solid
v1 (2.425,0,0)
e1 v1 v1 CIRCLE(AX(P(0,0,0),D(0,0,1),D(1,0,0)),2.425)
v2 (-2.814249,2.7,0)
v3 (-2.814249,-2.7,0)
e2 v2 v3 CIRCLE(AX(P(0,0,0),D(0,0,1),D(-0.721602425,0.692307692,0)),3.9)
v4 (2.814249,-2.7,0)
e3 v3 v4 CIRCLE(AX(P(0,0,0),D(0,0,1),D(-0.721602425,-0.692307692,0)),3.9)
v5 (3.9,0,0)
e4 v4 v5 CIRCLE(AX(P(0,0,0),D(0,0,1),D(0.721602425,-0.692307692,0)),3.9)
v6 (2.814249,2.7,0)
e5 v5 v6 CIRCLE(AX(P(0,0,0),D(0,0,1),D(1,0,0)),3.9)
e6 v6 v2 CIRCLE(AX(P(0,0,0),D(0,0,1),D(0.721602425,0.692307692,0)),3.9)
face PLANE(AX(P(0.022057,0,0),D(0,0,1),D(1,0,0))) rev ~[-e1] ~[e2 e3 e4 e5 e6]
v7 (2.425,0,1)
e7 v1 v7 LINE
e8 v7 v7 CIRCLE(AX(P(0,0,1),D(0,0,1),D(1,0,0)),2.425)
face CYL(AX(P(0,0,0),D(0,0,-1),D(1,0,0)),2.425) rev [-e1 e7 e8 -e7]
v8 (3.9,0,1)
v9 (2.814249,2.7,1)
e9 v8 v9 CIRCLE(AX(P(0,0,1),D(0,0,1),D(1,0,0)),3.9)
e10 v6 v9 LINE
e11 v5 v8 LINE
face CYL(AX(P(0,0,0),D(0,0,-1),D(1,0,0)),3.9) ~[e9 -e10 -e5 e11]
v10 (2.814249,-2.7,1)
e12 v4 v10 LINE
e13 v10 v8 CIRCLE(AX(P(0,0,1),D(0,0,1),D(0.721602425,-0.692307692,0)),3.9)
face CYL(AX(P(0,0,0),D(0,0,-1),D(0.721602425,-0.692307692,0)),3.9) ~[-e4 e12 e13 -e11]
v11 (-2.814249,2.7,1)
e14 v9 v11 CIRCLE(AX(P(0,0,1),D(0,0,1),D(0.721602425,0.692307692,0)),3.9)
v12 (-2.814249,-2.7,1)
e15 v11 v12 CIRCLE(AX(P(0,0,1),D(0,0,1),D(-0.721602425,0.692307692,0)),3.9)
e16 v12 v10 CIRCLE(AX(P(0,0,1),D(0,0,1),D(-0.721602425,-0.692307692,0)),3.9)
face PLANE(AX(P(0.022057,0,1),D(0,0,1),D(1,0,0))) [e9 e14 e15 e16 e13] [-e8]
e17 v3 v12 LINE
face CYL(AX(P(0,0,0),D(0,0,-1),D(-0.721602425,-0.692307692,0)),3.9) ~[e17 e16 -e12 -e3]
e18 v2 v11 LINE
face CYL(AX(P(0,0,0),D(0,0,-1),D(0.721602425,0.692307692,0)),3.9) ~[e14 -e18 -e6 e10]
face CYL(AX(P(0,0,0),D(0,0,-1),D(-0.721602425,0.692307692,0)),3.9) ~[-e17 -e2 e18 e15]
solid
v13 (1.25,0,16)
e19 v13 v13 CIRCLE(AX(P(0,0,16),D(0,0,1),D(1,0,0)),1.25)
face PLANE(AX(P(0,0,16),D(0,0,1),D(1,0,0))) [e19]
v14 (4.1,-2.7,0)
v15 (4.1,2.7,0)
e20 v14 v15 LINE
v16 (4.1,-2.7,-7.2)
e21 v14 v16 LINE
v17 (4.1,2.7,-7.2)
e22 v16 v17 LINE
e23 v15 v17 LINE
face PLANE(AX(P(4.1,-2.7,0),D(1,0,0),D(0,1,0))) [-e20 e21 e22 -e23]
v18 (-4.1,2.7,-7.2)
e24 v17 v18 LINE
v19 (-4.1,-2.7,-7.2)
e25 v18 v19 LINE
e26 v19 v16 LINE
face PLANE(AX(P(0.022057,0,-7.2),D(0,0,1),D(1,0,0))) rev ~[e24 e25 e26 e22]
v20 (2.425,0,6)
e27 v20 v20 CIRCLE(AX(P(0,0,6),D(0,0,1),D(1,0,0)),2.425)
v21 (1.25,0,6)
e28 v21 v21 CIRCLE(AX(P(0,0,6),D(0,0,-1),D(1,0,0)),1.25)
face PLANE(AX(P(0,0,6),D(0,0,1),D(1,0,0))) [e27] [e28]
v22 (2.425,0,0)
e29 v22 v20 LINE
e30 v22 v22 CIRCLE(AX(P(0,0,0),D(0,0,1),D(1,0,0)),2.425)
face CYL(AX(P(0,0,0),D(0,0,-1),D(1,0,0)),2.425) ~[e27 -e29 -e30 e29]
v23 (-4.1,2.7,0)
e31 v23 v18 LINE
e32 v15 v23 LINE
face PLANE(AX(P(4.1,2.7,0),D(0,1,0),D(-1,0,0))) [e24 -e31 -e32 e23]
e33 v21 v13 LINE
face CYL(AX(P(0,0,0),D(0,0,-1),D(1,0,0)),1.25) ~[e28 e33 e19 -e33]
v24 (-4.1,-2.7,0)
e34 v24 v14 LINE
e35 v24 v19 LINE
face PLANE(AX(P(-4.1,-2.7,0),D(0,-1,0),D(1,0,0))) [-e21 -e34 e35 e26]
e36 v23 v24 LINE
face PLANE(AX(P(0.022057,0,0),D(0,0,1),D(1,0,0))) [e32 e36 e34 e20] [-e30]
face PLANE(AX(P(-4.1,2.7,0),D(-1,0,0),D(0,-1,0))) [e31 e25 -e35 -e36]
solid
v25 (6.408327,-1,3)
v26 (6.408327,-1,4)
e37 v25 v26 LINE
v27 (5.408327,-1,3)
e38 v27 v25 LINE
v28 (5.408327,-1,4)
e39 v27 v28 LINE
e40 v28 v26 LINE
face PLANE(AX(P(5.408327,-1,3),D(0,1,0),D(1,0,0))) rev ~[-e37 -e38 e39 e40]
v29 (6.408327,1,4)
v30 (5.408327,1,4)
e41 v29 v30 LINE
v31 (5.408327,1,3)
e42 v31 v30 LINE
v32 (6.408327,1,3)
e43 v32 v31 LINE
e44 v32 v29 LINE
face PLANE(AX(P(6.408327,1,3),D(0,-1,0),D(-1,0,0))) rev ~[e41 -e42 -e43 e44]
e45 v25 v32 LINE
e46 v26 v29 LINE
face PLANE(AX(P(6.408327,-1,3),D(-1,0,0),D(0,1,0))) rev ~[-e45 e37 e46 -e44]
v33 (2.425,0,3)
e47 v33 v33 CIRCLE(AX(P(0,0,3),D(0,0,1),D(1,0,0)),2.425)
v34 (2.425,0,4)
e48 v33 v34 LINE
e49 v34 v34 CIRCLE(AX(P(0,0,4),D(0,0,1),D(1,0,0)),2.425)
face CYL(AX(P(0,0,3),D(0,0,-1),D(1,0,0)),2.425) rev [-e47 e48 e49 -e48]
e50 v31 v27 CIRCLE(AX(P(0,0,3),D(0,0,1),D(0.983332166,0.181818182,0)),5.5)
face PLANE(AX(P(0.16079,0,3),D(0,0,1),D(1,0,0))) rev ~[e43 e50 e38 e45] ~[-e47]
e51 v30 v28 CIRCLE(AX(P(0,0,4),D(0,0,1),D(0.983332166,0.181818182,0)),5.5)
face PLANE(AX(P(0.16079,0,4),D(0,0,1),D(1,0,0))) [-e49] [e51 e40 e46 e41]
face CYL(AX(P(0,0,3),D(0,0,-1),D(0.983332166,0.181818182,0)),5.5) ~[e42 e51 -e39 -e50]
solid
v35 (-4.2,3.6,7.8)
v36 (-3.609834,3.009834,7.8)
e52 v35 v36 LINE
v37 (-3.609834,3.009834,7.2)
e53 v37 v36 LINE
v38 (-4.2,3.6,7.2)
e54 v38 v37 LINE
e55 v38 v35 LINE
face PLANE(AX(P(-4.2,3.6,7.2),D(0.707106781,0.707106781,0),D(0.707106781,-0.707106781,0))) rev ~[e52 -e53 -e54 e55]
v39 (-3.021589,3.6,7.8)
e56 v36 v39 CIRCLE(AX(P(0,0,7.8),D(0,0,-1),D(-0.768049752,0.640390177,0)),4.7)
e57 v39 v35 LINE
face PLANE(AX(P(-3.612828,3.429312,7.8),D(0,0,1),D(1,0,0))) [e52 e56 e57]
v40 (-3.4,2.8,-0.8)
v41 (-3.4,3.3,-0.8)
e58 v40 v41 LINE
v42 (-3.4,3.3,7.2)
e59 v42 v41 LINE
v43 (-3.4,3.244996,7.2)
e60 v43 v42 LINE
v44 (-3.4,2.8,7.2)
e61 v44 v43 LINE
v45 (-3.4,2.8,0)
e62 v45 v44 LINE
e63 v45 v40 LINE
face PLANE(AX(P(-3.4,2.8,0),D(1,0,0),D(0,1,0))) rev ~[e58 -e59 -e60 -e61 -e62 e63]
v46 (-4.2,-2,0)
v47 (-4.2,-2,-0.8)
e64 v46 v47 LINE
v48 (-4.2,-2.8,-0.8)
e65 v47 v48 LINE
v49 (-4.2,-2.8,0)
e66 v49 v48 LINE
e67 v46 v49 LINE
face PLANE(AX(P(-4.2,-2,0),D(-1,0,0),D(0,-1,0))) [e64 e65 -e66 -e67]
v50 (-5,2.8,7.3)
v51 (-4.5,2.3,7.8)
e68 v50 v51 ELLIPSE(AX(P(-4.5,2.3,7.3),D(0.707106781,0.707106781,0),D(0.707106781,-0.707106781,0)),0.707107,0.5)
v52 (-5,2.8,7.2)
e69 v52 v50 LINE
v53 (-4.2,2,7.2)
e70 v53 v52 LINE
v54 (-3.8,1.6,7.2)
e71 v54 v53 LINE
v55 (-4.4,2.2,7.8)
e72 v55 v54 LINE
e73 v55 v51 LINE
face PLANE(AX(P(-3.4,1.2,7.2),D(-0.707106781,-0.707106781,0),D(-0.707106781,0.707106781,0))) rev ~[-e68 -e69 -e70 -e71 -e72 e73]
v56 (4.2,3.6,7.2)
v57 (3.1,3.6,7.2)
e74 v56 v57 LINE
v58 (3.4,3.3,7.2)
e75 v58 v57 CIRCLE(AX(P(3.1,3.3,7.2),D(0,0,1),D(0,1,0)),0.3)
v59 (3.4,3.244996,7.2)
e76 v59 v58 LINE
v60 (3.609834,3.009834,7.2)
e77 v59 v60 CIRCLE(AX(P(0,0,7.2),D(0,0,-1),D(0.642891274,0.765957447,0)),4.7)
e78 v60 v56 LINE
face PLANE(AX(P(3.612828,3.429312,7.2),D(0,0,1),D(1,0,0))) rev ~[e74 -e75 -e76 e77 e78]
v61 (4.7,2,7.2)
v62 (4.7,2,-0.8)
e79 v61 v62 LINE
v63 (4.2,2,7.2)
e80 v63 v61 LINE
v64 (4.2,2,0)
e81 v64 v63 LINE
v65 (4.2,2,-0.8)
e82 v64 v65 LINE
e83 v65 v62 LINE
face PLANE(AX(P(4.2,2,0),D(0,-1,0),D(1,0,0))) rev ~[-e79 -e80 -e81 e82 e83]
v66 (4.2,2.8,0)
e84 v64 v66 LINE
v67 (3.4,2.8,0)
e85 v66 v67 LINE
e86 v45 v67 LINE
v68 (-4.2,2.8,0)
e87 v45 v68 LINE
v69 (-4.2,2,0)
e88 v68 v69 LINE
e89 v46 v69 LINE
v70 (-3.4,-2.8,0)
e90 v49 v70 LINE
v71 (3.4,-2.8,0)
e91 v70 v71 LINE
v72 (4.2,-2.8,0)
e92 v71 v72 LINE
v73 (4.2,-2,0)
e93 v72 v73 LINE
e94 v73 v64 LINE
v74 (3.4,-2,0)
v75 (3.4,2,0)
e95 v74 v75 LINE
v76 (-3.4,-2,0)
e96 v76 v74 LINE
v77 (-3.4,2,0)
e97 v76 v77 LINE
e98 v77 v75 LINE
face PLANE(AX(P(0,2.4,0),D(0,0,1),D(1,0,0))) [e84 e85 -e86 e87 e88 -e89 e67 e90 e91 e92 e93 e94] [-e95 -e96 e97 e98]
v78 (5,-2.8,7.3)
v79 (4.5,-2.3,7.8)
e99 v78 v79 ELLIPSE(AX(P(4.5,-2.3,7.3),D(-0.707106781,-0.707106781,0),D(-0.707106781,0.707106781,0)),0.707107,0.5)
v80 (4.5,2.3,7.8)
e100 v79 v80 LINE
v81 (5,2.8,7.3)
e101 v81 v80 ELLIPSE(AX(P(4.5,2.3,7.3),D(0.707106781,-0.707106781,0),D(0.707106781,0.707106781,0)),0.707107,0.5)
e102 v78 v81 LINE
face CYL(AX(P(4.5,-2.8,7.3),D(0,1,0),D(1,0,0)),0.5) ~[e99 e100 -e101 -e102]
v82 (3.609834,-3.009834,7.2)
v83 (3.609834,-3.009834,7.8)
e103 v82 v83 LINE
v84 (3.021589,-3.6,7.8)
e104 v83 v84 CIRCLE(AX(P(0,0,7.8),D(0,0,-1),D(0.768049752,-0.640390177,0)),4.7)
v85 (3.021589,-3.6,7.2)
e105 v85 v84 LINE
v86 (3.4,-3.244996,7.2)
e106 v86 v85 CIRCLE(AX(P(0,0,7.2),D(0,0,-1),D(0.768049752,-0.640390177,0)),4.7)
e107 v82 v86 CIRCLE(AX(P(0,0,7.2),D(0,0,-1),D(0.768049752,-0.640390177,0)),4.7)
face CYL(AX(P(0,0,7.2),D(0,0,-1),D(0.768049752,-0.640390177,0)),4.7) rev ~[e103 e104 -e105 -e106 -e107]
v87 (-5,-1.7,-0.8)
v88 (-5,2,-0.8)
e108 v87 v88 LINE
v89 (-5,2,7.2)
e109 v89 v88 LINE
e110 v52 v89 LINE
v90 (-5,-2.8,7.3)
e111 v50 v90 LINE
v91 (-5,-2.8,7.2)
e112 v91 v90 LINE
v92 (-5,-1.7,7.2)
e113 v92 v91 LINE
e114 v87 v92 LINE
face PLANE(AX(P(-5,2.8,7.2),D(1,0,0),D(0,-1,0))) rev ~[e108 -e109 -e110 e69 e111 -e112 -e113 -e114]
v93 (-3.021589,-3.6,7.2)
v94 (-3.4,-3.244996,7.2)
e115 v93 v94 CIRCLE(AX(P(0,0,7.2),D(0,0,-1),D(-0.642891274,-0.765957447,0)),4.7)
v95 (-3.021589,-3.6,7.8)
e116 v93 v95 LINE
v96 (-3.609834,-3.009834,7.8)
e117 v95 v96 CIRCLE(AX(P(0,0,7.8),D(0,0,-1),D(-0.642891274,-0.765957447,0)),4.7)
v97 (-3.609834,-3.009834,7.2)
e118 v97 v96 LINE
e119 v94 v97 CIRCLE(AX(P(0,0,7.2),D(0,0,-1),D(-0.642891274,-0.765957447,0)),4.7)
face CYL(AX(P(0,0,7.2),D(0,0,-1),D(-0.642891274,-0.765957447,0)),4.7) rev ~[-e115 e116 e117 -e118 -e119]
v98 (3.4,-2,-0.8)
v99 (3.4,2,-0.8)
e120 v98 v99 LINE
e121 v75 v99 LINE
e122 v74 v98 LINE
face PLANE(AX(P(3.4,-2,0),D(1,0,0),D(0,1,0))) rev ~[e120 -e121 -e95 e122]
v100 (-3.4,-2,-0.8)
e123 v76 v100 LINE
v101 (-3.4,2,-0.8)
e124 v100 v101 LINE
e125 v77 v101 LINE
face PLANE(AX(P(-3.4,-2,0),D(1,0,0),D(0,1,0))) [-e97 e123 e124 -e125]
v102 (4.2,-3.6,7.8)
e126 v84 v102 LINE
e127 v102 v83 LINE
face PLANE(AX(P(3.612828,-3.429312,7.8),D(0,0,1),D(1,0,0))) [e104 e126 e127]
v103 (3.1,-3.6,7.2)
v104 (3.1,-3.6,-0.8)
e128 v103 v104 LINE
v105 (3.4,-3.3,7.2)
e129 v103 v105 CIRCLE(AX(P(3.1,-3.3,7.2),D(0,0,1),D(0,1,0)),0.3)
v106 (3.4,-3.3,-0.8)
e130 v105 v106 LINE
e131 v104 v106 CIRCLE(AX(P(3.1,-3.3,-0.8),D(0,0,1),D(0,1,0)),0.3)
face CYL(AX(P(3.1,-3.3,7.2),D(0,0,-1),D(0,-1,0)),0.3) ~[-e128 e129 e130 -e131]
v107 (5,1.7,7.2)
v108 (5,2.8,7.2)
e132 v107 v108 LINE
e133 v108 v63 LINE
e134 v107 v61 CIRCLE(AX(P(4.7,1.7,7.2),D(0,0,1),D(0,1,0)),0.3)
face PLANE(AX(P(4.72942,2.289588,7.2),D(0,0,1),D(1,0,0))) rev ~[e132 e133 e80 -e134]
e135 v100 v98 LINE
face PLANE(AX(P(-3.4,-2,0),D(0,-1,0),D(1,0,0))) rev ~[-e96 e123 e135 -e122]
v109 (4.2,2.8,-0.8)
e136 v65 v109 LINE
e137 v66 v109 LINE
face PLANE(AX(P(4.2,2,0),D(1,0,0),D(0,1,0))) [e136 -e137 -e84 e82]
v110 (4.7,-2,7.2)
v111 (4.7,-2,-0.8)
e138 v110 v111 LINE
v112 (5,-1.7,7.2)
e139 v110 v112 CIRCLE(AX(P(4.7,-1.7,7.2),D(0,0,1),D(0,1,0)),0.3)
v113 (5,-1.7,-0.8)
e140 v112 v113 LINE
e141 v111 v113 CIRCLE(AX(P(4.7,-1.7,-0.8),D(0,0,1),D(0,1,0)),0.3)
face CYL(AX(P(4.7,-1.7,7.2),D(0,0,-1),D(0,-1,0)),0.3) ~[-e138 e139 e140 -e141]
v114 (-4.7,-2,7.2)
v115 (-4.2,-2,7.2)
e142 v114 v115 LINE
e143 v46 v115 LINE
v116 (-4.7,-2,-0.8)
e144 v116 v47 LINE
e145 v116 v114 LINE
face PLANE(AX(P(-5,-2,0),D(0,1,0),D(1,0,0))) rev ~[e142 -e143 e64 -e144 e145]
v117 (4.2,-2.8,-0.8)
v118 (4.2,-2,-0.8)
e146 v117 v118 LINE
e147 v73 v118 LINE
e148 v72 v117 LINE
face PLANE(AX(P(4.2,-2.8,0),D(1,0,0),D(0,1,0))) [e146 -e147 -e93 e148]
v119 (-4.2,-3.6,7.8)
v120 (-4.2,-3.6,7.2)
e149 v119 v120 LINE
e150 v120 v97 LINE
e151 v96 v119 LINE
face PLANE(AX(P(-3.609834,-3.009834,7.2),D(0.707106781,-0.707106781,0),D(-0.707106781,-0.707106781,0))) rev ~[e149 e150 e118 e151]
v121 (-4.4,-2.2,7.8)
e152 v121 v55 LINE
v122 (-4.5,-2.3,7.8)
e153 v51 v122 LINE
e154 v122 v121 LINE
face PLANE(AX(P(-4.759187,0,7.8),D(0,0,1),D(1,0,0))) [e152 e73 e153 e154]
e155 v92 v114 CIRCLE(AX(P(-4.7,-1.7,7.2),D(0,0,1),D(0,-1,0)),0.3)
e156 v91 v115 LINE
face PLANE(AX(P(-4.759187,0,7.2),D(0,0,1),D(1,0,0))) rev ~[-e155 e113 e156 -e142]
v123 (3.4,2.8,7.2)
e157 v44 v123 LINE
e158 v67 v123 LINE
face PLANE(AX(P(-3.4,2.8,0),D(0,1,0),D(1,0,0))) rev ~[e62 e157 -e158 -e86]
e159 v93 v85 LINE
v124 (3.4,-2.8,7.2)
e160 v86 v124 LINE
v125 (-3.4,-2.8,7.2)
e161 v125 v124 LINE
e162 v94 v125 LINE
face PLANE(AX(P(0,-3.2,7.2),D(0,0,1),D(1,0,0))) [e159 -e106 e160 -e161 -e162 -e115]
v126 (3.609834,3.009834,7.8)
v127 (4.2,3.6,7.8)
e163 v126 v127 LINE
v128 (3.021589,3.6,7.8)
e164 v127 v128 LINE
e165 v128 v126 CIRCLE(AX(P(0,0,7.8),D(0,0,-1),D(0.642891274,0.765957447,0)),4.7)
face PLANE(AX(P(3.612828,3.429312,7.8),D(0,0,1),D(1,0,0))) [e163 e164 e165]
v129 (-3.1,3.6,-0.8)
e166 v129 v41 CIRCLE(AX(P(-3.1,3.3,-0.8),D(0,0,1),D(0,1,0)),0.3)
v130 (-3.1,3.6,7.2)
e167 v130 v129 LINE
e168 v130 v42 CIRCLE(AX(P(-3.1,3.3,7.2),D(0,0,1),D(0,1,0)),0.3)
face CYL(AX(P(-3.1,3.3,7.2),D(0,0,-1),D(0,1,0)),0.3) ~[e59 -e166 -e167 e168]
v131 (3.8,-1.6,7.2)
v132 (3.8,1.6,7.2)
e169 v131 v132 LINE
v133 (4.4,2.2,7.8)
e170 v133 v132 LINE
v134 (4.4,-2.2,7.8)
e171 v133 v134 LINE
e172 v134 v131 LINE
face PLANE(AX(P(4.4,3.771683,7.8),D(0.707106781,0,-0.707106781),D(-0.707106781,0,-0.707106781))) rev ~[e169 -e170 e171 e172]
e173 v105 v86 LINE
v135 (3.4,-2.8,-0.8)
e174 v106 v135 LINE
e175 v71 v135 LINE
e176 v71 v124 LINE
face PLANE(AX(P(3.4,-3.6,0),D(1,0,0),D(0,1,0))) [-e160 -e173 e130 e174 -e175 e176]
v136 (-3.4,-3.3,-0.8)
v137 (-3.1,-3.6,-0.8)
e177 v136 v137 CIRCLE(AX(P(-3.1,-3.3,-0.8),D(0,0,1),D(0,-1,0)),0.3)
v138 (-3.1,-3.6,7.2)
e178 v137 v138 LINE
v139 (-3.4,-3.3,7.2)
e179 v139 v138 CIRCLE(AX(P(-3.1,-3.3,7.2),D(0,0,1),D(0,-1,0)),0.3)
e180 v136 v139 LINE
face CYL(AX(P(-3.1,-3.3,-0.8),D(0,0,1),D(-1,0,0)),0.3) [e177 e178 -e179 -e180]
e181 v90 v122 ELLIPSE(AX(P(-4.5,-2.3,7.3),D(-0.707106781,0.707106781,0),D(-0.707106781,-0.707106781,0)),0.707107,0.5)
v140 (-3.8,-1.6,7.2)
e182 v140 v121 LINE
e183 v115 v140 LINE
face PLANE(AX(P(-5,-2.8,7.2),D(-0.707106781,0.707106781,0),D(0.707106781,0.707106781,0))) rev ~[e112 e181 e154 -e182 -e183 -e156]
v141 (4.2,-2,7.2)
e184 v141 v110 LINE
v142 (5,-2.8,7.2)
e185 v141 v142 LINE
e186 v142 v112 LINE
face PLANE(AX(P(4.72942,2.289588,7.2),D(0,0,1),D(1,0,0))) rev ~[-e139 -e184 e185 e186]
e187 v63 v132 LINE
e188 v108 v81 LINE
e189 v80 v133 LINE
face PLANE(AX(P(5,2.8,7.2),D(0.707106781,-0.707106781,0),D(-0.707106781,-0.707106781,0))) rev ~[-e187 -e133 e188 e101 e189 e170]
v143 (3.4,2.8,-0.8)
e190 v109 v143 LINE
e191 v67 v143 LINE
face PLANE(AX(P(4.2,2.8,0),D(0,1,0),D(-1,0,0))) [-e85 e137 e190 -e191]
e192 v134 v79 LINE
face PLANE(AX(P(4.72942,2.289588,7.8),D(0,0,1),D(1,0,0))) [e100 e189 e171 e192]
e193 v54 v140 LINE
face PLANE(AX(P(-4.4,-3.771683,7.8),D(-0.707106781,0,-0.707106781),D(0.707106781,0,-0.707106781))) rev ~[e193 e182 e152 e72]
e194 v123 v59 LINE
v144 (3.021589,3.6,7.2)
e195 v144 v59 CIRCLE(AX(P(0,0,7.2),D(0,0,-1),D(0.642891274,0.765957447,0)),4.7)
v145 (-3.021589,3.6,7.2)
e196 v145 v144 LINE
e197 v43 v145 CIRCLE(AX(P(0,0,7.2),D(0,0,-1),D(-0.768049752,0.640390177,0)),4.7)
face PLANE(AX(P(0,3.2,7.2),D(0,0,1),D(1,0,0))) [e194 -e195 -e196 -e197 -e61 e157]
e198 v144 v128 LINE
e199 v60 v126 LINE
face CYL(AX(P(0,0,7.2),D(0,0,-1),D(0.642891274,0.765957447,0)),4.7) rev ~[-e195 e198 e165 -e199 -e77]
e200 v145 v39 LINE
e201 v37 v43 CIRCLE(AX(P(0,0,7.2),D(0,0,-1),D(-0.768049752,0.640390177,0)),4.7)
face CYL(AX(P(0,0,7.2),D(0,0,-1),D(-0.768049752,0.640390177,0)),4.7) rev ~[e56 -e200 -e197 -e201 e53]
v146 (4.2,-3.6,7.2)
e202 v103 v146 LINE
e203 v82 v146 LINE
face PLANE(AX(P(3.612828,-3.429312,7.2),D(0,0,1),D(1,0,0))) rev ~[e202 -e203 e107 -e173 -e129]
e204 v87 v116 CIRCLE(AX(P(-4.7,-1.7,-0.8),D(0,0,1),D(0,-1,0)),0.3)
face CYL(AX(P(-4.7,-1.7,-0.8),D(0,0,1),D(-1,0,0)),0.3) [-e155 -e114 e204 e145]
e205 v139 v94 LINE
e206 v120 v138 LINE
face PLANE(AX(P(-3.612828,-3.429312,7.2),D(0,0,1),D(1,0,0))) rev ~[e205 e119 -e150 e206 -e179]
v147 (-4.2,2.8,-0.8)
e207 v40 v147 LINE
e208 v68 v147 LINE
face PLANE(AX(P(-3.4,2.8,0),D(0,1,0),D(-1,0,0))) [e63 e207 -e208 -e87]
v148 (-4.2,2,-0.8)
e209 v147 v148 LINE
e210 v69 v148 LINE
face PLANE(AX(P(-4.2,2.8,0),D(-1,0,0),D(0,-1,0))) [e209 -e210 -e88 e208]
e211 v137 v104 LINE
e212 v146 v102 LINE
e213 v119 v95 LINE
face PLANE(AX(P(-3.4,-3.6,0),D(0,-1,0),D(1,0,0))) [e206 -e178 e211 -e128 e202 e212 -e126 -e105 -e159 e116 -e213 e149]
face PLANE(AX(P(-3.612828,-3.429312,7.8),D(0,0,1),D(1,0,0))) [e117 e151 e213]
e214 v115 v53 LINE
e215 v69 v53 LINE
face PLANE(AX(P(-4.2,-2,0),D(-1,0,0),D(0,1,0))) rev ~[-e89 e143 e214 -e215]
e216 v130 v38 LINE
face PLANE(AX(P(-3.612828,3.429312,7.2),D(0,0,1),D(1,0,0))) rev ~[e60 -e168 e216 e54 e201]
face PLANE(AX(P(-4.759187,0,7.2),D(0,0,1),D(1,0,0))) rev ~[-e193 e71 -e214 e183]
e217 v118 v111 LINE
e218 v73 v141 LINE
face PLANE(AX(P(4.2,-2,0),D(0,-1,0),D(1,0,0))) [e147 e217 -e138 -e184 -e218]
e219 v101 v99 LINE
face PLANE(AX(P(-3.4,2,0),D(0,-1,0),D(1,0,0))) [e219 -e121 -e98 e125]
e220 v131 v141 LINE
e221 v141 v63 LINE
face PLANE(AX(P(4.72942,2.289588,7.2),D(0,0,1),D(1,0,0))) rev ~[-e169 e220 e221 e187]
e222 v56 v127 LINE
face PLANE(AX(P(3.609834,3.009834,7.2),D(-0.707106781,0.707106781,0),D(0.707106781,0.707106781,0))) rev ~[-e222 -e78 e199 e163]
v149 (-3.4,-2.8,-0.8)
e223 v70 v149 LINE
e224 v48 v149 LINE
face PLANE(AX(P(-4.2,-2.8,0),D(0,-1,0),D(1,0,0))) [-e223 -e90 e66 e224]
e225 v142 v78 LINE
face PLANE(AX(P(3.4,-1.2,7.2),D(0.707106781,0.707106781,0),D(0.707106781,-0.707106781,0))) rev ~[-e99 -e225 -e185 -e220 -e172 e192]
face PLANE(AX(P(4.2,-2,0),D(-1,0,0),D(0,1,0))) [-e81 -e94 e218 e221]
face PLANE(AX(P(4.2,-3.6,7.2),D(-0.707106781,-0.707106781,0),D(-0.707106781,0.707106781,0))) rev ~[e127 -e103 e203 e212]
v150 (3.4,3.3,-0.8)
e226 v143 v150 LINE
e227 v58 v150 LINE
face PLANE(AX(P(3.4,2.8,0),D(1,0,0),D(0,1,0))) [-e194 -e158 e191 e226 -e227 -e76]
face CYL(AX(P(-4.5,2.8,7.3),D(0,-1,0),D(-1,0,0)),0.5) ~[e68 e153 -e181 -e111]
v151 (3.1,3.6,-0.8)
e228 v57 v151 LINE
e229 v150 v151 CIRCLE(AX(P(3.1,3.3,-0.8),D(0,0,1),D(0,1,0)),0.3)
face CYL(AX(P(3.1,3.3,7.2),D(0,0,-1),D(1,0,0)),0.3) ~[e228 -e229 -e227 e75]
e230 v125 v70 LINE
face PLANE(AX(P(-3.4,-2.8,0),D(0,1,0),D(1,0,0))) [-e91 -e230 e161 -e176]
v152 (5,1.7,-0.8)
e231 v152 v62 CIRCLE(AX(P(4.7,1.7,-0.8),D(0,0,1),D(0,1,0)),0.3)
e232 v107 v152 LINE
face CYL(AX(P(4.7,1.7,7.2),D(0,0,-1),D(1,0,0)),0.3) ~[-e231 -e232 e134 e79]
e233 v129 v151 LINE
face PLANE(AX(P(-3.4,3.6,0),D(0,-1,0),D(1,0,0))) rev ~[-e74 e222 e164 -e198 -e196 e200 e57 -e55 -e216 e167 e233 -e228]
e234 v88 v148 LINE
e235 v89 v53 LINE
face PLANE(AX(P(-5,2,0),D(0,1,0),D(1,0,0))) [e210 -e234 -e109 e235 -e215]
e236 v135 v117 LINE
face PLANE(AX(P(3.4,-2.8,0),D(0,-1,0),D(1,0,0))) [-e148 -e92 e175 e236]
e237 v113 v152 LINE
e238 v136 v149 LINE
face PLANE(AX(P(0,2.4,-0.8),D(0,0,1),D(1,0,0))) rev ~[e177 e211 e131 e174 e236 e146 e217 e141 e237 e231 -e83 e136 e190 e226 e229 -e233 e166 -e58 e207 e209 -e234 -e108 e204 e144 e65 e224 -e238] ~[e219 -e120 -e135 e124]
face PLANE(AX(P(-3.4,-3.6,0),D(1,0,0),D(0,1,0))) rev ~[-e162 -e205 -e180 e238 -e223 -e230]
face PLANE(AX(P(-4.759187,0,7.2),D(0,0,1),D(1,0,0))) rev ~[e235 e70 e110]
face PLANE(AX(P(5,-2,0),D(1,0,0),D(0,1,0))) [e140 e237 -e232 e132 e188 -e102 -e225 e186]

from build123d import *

# Parameters (mm, degrees)
F2_R           = 2.425
F2_R_2         = 1.25
F3_DEPTH       = 7.2
F4_DEPTH       = 6
F5_DEPTH       = 1
F6_START       = 3
F6_DEPTH       = 1
F7_DEPTH       = 16
F8_W           = 6.8
F8_H           = 0.8
F8_W_2         = 0.8
F8_H_2         = 4
F9_DEPTH       = 0.8
F10_DEPTH      = 7.2
F10_DEPTH_BACK = 0.8
F12_DEPTH      = 0.6
F13_R          = 0.5
F14_R          = 0.3
F15_T4_DEPTH   = 7.5433659759
F15_T10_DEPTH  = 7.5433659759


# Not quite as in the source:
# - a fillet or chamfer that OpenCascade refuses, or shapes differently, is made with other operations: its cross-section is extruded or revolved along the edge and cut away or added
# - a feature names something its author has since deleted; it is built from what else it names


with BuildPart() as f3:
    # F2 (on Top) → F3 (new body)
    with BuildSketch(Plane.XY):
        with BuildLine():
            Line((-2.8142494559, -2.7), (2.8142494559, -2.7))
            ThreePointArc((2.8142494559, -2.7), (3.6183955614, -1.4550647962), (3.9, 0))
            ThreePointArc((3.9, 0), (3.6183955614, 1.4550647962), (2.8142494559, 2.7))
            Line((2.8142494559, 2.7), (-2.8142494559, 2.7))
            ThreePointArc((-2.8142494559, 2.7), (-3.9, 0), (-2.8142494559, -2.7))
        make_face()
        Circle(F2_R, mode=Mode.SUBTRACT)
        Circle(F2_R)
        Circle(F2_R_2, mode=Mode.SUBTRACT)
        Circle(F2_R_2)
        with BuildLine():
            Line((2.8142494559, -2.7), (4.1, -2.7))
            Line((4.1, -2.7), (4.1, 2.7))
            Line((4.1, 2.7), (2.8142494559, 2.7))
            ThreePointArc((2.8142494559, 2.7), (3.6183955614, 1.4550647962), (3.9, 0))
            ThreePointArc((3.9, 0), (3.6183955614, -1.4550647962), (2.8142494559, -2.7))
        make_face()
        with BuildLine():
            Line((-4.1, -2.7), (-2.8142494559, -2.7))
            ThreePointArc((-2.8142494559, -2.7), (-3.9, 0), (-2.8142494559, 2.7))
            Line((-2.8142494559, 2.7), (-4.1, 2.7))
            Line((-4.1, 2.7), (-4.1, -2.7))
        make_face()
    extrude(amount=-F3_DEPTH)

    # F2 (on Top) → F4 (join)
    with BuildSketch(Plane.XY):
        Circle(F2_R)
        Circle(F2_R_2, mode=Mode.SUBTRACT)
        Circle(F2_R_2)
    extrude(amount=F4_DEPTH)

    # F2 (on Top) → F7 (join)
    with BuildSketch(Plane.XY):
        Circle(F2_R_2)
    extrude(amount=F7_DEPTH)


with BuildPart() as f5:
    # F2 (on Top) → F5 (new body)
    with BuildSketch(Plane.XY):
        with BuildLine():
            Line((-2.8142494559, -2.7), (2.8142494559, -2.7))
            ThreePointArc((2.8142494559, -2.7), (3.6183955614, -1.4550647962), (3.9, 0))
            ThreePointArc((3.9, 0), (3.6183955614, 1.4550647962), (2.8142494559, 2.7))
            Line((2.8142494559, 2.7), (-2.8142494559, 2.7))
            ThreePointArc((-2.8142494559, 2.7), (-3.9, 0), (-2.8142494559, -2.7))
        make_face()
        Circle(F2_R, mode=Mode.SUBTRACT)
        with BuildLine():
            ThreePointArc((-2.8142494559, -2.7), (0, -3.9), (2.8142494559, -2.7))
            Line((2.8142494559, -2.7), (-2.8142494559, -2.7))
        make_face()
        with BuildLine():
            Line((-2.8142494559, 2.7), (2.8142494559, 2.7))
            ThreePointArc((2.8142494559, 2.7), (0, 3.9), (-2.8142494559, 2.7))
        make_face()
    extrude(amount=F5_DEPTH)


with BuildPart() as f6:
    # F2 (on Top) → F6 (new body)
    with BuildSketch(Plane.XY.offset(F6_START)):
        with BuildLine():
            Line((5.4083269132, -1), (5.4083269132, 1))
            ThreePointArc((5.4083269132, 1), (-5.5, 0), (5.4083269132, -1))
        make_face()
        with BuildLine():
            Line((4.1, 2.7), (4.1, -2.7))
            Line((4.1, -2.7), (2.8142494559, -2.7))
            ThreePointArc((2.8142494559, -2.7), (0, -3.9), (-2.8142494559, -2.7))
            Line((-2.8142494559, -2.7), (-4.1, -2.7))
            Line((-4.1, -2.7), (-4.1, 2.7))
            Line((-4.1, 2.7), (-2.8142494559, 2.7))
            ThreePointArc((-2.8142494559, 2.7), (0, 3.9), (2.8142494559, 2.7))
            Line((2.8142494559, 2.7), (4.1, 2.7))
        make_face(mode=Mode.SUBTRACT)
        with BuildLine():
            Line((-4.1, -2.7), (-2.8142494559, -2.7))
            ThreePointArc((-2.8142494559, -2.7), (-3.9, 0), (-2.8142494559, 2.7))
            Line((-2.8142494559, 2.7), (-4.1, 2.7))
            Line((-4.1, 2.7), (-4.1, -2.7))
        make_face()
        with BuildLine():
            Line((2.8142494559, -2.7), (4.1, -2.7))
            Line((4.1, -2.7), (4.1, 2.7))
            Line((4.1, 2.7), (2.8142494559, 2.7))
            ThreePointArc((2.8142494559, 2.7), (3.6183955614, 1.4550647962), (3.9, 0))
            ThreePointArc((3.9, 0), (3.6183955614, -1.4550647962), (2.8142494559, -2.7))
        make_face()
        with BuildLine():
            ThreePointArc((5.4083269132, 1), (5.4770337785, 0.502096593), (5.5, 0))
            ThreePointArc((5.5, 0), (5.4770337785, -0.502096593), (5.4083269132, -1))
            Line((5.4083269132, -1), (6.4083269132, -1))
            Line((6.4083269132, -1), (6.4083269132, 1))
            Line((6.4083269132, 1), (5.4083269132, 1))
        make_face()
        with BuildLine():
            ThreePointArc((5.4083269132, -1), (5.4770337785, -0.502096593), (5.5, 0))
            ThreePointArc((5.5, 0), (5.4770337785, 0.502096593), (5.4083269132, 1))
            Line((5.4083269132, 1), (5.4083269132, -1))
        make_face()
        with BuildLine():
            Line((-2.8142494559, 2.7), (2.8142494559, 2.7))
            ThreePointArc((2.8142494559, 2.7), (0, 3.9), (-2.8142494559, 2.7))
        make_face()
        with BuildLine():
            Line((-2.8142494559, -2.7), (2.8142494559, -2.7))
            ThreePointArc((2.8142494559, -2.7), (3.6183955614, -1.4550647962), (3.9, 0))
            ThreePointArc((3.9, 0), (3.6183955614, 1.4550647962), (2.8142494559, 2.7))
            Line((2.8142494559, 2.7), (-2.8142494559, 2.7))
            ThreePointArc((-2.8142494559, 2.7), (-3.9, 0), (-2.8142494559, -2.7))
        make_face()
        Circle(F2_R, mode=Mode.SUBTRACT)
        with BuildLine():
            ThreePointArc((-2.8142494559, -2.7), (0, -3.9), (2.8142494559, -2.7))
            Line((2.8142494559, -2.7), (-2.8142494559, -2.7))
        make_face()
    extrude(amount=F6_DEPTH)


with BuildPart() as f9:
    # F8 (on Top) → F9 (new body)
    with BuildSketch(Plane.XY):
        with Locations((0, 2.4)):
            Rectangle(F8_W, F8_H)
        with Locations((-3.8, 2.4)):
            Rectangle(F8_W_2, F8_H)
        with Locations((-3.8, 0)):
            Rectangle(F8_W_2, F8_H_2)
        with Locations((-3.8, -2.4)):
            Rectangle(F8_W_2, F8_H)
        with Locations((0, -2.4)):
            Rectangle(F8_W, F8_H)
        with Locations((3.8, 0)):
            Rectangle(F8_W_2, F8_H_2)
        with Locations((3.8, -2.4)):
            Rectangle(F8_W_2, F8_H)
        with Locations((3.8, 2.4)):
            Rectangle(F8_W_2, F8_H)
        with Locations((-4.6, 0)):
            Rectangle(F8_W_2, F8_H_2)
        with Locations((0, 3.2)):
            Rectangle(F8_W, F8_H)
        with Locations((0, -3.2)):
            Rectangle(F8_W, F8_H)
        with Locations((4.6, 0)):
            Rectangle(F8_W_2, F8_H_2)
    extrude(amount=-F9_DEPTH)

    # F8 (on Top) → F10 (join, two sides)
    with BuildSketch(Plane.XY) as f10_sk:
        with Locations((-4.6, 0)):
            Rectangle(F8_W_2, F8_H_2)
        with Locations((4.6, 0)):
            Rectangle(F8_W_2, F8_H_2)
        with Locations((0, -3.2)):
            Rectangle(F8_W, F8_H)
        with Locations((0, 3.2)):
            Rectangle(F8_W, F8_H)
    extrude(amount=F10_DEPTH)
    extrude(f10_sk.sketch, amount=-F10_DEPTH_BACK)

    # F11 (on face) → F12 (join)
    with BuildSketch(Plane.XY.offset(7.2)):
        with BuildLine():
            Line((-4.2360803561, 2.0360803561), (-5, 2.8))
            Line((-5, 2.8), (-5, -2.8))
            Line((-5, -2.8), (-4.2360803561, -2.0360803561))
            ThreePointArc((-4.2360803561, -2.0360803561), (-4.7, 0), (-4.2360803561, 2.0360803561))
        make_face()
        with BuildLine():
            Line((5, 2.8), (4.2360803561, 2.0360803561))
            ThreePointArc((4.2360803561, 2.0360803561), (4.2446955459, 2.0180584042), (4.2532340636, 2))
            Line((4.2532340636, 2), (5, 2))
            Line((5, 2), (5, 2.8))
        make_face()
        with BuildLine():
            Line((5, -2.8), (5, -2))
            Line((5, -2), (4.2532340636, -2))
            ThreePointArc((4.2532340636, -2), (4.2446955459, -2.0180584042), (4.2360803561, -2.0360803561))
            Line((4.2360803561, -2.0360803561), (5, -2.8))
        make_face()
        with BuildLine():
            Line((5, 2), (4.2532340636, 2))
            ThreePointArc((4.2532340636, 2), (4.5869488824, 1.0246462563), (4.7, 0))
            ThreePointArc((4.7, 0), (4.5869488824, -1.0246462563), (4.2532340636, -2))
            Line((4.2532340636, -2), (5, -2))
            Line((5, -2), (5, 2))
        make_face()
        with BuildLine():
            ThreePointArc((4.7, 0), (4.5869488824, 1.0246462563), (4.2532340636, 2))
            Line((4.2532340636, 2), (4.2, 2))
            Line((4.2, 2), (4.2, -2))
            Line((4.2, -2), (4.2532340636, -2))
            ThreePointArc((4.2532340636, -2), (4.5869488824, -1.0246462563), (4.7, 0))
        make_face()
        with BuildLine():
            Line((-3.0215889859, 3.6), (-4.2, 3.6))
            Line((-4.2, 3.6), (-3.6098338327, 3.0098338327))
            ThreePointArc((-3.6098338327, 3.0098338327), (-3.3288160322, 3.3179788763), (-3.0215889859, 3.6))
        make_face()
        with BuildLine():
            ThreePointArc((3.6098338327, -3.0098338327), (3.3288160322, -3.3179788763), (3.0215889859, -3.6))
            Line((3.0215889859, -3.6), (4.2, -3.6))
            Line((4.2, -3.6), (3.6098338327, -3.0098338327))
        make_face()
        with BuildLine():
            Line((4.2, 3.6), (3.0215889859, 3.6))
            ThreePointArc((3.0215889859, 3.6), (3.3288160322, 3.3179788763), (3.6098338327, 3.0098338327))
            Line((3.6098338327, 3.0098338327), (4.2, 3.6))
        make_face()
        with BuildLine():
            Line((-3.6098338327, -3.0098338327), (-4.2, -3.6))
            Line((-4.2, -3.6), (-3.0215889859, -3.6))
            ThreePointArc((-3.0215889859, -3.6), (-3.3288160322, -3.3179788763), (-3.6098338327, -3.0098338327))
        make_face()
        with BuildLine():
            Line((4.2532340636, -2), (4.2, -2))
            Line((4.2, -2), (4.2360803561, -2.0360803561))
            ThreePointArc((4.2360803561, -2.0360803561), (4.2446955459, -2.0180584042), (4.2532340636, -2))
        make_face()
        with BuildLine():
            ThreePointArc((4.2532340636, 2), (4.2446955459, 2.0180584042), (4.2360803561, 2.0360803561))
            Line((4.2360803561, 2.0360803561), (4.2, 2))
            Line((4.2, 2), (4.2532340636, 2))
        make_face()
        with BuildLine():
            Line((-3.4, 1.2), (-4.2360803561, 2.0360803561))
            ThreePointArc((-4.2360803561, 2.0360803561), (-4.7, 0), (-4.2360803561, -2.0360803561))
            Line((-4.2360803561, -2.0360803561), (-3.4, -1.2))
            Line((-3.4, -1.2), (-3.4, 1.2))
        make_face()
        Polygon((4.2, -2), (4.2, 2), (3.4, 1.2), (3.4, -1.2), align=None)
    extrude(amount=F12_DEPTH)

    # F13
    f13_edges = [f9.edges().sort_by_distance(p)[0] for p in [
        (-5, 0, 7.8),
        (5, 0, 7.8),
    ]]
    fillet(f13_edges, radius=F13_R)

    # F14
    f14_edges = [f9.edges().sort_by_distance(p)[0] for p in [
        (5, 2, 3.2),
        (3.4, 3.6, 3.2),
        (-3.4, 3.6, 3.2),
        (5, -2, 3.2),
        (3.4, -3.6, 3.2),
        (-3.4, -3.6, 3.2),
        (-5, -2, 3.2),
    ]]
    fillet(f14_edges, radius=F14_R)

    # F15: chamfer of 1 on 2 edges, made by hand


with BuildPart() as f15_tool2:
    # F15_s3 → F15_t4 (new body)
    with BuildSketch(Plane.XZ.offset(-3.771682988)):
        Polygon((4.4, 7.8), (3.4, 6.8), (3.4, 7.8), align=None)
    extrude(amount=F15_T4_DEPTH)

    split(bisect_by=Plane(origin=(1.1, -1.1, 0), x_dir=(0, 0, 1), z_dir=(0.7071067812, -0.7071067812, 0)), keep=Keep.TOP)

    split(bisect_by=Plane(origin=(0.3, 0.3, 0), x_dir=(0, 0, 1), z_dir=(0.7071067812, 0.7071067812, 0)), keep=Keep.TOP)


with BuildPart() as f9_1:
    add(f9.part)

    # F15_t1: cut F15_tool2
    add(f15_tool2.part, mode=Mode.SUBTRACT)


with BuildPart() as f15_tool8:
    # F15_s9 → F15_t10 (new body)
    with BuildSketch(Plane.XZ.offset(3.771682988)):
        Polygon((-4.4, 7.8), (-3.4, 6.8), (-3.4, 7.8), align=None)
    extrude(amount=-F15_T10_DEPTH)

    split(bisect_by=Plane.XZ.offset(-2.8), keep=Keep.TOP)

    split(bisect_by=Plane(origin=(-0.3, 0.3, 0), x_dir=(0, 0, 1), z_dir=(-0.7071067812, 0.7071067812, 0)), keep=Keep.TOP)


with BuildPart() as f9_2:
    add(f9_1.part)

    # F15_t7: cut F15_tool8
    add(f15_tool8.part, mode=Mode.SUBTRACT)


solid = Compound([f3.part, f5.part, f6.part, f9_2.part])
